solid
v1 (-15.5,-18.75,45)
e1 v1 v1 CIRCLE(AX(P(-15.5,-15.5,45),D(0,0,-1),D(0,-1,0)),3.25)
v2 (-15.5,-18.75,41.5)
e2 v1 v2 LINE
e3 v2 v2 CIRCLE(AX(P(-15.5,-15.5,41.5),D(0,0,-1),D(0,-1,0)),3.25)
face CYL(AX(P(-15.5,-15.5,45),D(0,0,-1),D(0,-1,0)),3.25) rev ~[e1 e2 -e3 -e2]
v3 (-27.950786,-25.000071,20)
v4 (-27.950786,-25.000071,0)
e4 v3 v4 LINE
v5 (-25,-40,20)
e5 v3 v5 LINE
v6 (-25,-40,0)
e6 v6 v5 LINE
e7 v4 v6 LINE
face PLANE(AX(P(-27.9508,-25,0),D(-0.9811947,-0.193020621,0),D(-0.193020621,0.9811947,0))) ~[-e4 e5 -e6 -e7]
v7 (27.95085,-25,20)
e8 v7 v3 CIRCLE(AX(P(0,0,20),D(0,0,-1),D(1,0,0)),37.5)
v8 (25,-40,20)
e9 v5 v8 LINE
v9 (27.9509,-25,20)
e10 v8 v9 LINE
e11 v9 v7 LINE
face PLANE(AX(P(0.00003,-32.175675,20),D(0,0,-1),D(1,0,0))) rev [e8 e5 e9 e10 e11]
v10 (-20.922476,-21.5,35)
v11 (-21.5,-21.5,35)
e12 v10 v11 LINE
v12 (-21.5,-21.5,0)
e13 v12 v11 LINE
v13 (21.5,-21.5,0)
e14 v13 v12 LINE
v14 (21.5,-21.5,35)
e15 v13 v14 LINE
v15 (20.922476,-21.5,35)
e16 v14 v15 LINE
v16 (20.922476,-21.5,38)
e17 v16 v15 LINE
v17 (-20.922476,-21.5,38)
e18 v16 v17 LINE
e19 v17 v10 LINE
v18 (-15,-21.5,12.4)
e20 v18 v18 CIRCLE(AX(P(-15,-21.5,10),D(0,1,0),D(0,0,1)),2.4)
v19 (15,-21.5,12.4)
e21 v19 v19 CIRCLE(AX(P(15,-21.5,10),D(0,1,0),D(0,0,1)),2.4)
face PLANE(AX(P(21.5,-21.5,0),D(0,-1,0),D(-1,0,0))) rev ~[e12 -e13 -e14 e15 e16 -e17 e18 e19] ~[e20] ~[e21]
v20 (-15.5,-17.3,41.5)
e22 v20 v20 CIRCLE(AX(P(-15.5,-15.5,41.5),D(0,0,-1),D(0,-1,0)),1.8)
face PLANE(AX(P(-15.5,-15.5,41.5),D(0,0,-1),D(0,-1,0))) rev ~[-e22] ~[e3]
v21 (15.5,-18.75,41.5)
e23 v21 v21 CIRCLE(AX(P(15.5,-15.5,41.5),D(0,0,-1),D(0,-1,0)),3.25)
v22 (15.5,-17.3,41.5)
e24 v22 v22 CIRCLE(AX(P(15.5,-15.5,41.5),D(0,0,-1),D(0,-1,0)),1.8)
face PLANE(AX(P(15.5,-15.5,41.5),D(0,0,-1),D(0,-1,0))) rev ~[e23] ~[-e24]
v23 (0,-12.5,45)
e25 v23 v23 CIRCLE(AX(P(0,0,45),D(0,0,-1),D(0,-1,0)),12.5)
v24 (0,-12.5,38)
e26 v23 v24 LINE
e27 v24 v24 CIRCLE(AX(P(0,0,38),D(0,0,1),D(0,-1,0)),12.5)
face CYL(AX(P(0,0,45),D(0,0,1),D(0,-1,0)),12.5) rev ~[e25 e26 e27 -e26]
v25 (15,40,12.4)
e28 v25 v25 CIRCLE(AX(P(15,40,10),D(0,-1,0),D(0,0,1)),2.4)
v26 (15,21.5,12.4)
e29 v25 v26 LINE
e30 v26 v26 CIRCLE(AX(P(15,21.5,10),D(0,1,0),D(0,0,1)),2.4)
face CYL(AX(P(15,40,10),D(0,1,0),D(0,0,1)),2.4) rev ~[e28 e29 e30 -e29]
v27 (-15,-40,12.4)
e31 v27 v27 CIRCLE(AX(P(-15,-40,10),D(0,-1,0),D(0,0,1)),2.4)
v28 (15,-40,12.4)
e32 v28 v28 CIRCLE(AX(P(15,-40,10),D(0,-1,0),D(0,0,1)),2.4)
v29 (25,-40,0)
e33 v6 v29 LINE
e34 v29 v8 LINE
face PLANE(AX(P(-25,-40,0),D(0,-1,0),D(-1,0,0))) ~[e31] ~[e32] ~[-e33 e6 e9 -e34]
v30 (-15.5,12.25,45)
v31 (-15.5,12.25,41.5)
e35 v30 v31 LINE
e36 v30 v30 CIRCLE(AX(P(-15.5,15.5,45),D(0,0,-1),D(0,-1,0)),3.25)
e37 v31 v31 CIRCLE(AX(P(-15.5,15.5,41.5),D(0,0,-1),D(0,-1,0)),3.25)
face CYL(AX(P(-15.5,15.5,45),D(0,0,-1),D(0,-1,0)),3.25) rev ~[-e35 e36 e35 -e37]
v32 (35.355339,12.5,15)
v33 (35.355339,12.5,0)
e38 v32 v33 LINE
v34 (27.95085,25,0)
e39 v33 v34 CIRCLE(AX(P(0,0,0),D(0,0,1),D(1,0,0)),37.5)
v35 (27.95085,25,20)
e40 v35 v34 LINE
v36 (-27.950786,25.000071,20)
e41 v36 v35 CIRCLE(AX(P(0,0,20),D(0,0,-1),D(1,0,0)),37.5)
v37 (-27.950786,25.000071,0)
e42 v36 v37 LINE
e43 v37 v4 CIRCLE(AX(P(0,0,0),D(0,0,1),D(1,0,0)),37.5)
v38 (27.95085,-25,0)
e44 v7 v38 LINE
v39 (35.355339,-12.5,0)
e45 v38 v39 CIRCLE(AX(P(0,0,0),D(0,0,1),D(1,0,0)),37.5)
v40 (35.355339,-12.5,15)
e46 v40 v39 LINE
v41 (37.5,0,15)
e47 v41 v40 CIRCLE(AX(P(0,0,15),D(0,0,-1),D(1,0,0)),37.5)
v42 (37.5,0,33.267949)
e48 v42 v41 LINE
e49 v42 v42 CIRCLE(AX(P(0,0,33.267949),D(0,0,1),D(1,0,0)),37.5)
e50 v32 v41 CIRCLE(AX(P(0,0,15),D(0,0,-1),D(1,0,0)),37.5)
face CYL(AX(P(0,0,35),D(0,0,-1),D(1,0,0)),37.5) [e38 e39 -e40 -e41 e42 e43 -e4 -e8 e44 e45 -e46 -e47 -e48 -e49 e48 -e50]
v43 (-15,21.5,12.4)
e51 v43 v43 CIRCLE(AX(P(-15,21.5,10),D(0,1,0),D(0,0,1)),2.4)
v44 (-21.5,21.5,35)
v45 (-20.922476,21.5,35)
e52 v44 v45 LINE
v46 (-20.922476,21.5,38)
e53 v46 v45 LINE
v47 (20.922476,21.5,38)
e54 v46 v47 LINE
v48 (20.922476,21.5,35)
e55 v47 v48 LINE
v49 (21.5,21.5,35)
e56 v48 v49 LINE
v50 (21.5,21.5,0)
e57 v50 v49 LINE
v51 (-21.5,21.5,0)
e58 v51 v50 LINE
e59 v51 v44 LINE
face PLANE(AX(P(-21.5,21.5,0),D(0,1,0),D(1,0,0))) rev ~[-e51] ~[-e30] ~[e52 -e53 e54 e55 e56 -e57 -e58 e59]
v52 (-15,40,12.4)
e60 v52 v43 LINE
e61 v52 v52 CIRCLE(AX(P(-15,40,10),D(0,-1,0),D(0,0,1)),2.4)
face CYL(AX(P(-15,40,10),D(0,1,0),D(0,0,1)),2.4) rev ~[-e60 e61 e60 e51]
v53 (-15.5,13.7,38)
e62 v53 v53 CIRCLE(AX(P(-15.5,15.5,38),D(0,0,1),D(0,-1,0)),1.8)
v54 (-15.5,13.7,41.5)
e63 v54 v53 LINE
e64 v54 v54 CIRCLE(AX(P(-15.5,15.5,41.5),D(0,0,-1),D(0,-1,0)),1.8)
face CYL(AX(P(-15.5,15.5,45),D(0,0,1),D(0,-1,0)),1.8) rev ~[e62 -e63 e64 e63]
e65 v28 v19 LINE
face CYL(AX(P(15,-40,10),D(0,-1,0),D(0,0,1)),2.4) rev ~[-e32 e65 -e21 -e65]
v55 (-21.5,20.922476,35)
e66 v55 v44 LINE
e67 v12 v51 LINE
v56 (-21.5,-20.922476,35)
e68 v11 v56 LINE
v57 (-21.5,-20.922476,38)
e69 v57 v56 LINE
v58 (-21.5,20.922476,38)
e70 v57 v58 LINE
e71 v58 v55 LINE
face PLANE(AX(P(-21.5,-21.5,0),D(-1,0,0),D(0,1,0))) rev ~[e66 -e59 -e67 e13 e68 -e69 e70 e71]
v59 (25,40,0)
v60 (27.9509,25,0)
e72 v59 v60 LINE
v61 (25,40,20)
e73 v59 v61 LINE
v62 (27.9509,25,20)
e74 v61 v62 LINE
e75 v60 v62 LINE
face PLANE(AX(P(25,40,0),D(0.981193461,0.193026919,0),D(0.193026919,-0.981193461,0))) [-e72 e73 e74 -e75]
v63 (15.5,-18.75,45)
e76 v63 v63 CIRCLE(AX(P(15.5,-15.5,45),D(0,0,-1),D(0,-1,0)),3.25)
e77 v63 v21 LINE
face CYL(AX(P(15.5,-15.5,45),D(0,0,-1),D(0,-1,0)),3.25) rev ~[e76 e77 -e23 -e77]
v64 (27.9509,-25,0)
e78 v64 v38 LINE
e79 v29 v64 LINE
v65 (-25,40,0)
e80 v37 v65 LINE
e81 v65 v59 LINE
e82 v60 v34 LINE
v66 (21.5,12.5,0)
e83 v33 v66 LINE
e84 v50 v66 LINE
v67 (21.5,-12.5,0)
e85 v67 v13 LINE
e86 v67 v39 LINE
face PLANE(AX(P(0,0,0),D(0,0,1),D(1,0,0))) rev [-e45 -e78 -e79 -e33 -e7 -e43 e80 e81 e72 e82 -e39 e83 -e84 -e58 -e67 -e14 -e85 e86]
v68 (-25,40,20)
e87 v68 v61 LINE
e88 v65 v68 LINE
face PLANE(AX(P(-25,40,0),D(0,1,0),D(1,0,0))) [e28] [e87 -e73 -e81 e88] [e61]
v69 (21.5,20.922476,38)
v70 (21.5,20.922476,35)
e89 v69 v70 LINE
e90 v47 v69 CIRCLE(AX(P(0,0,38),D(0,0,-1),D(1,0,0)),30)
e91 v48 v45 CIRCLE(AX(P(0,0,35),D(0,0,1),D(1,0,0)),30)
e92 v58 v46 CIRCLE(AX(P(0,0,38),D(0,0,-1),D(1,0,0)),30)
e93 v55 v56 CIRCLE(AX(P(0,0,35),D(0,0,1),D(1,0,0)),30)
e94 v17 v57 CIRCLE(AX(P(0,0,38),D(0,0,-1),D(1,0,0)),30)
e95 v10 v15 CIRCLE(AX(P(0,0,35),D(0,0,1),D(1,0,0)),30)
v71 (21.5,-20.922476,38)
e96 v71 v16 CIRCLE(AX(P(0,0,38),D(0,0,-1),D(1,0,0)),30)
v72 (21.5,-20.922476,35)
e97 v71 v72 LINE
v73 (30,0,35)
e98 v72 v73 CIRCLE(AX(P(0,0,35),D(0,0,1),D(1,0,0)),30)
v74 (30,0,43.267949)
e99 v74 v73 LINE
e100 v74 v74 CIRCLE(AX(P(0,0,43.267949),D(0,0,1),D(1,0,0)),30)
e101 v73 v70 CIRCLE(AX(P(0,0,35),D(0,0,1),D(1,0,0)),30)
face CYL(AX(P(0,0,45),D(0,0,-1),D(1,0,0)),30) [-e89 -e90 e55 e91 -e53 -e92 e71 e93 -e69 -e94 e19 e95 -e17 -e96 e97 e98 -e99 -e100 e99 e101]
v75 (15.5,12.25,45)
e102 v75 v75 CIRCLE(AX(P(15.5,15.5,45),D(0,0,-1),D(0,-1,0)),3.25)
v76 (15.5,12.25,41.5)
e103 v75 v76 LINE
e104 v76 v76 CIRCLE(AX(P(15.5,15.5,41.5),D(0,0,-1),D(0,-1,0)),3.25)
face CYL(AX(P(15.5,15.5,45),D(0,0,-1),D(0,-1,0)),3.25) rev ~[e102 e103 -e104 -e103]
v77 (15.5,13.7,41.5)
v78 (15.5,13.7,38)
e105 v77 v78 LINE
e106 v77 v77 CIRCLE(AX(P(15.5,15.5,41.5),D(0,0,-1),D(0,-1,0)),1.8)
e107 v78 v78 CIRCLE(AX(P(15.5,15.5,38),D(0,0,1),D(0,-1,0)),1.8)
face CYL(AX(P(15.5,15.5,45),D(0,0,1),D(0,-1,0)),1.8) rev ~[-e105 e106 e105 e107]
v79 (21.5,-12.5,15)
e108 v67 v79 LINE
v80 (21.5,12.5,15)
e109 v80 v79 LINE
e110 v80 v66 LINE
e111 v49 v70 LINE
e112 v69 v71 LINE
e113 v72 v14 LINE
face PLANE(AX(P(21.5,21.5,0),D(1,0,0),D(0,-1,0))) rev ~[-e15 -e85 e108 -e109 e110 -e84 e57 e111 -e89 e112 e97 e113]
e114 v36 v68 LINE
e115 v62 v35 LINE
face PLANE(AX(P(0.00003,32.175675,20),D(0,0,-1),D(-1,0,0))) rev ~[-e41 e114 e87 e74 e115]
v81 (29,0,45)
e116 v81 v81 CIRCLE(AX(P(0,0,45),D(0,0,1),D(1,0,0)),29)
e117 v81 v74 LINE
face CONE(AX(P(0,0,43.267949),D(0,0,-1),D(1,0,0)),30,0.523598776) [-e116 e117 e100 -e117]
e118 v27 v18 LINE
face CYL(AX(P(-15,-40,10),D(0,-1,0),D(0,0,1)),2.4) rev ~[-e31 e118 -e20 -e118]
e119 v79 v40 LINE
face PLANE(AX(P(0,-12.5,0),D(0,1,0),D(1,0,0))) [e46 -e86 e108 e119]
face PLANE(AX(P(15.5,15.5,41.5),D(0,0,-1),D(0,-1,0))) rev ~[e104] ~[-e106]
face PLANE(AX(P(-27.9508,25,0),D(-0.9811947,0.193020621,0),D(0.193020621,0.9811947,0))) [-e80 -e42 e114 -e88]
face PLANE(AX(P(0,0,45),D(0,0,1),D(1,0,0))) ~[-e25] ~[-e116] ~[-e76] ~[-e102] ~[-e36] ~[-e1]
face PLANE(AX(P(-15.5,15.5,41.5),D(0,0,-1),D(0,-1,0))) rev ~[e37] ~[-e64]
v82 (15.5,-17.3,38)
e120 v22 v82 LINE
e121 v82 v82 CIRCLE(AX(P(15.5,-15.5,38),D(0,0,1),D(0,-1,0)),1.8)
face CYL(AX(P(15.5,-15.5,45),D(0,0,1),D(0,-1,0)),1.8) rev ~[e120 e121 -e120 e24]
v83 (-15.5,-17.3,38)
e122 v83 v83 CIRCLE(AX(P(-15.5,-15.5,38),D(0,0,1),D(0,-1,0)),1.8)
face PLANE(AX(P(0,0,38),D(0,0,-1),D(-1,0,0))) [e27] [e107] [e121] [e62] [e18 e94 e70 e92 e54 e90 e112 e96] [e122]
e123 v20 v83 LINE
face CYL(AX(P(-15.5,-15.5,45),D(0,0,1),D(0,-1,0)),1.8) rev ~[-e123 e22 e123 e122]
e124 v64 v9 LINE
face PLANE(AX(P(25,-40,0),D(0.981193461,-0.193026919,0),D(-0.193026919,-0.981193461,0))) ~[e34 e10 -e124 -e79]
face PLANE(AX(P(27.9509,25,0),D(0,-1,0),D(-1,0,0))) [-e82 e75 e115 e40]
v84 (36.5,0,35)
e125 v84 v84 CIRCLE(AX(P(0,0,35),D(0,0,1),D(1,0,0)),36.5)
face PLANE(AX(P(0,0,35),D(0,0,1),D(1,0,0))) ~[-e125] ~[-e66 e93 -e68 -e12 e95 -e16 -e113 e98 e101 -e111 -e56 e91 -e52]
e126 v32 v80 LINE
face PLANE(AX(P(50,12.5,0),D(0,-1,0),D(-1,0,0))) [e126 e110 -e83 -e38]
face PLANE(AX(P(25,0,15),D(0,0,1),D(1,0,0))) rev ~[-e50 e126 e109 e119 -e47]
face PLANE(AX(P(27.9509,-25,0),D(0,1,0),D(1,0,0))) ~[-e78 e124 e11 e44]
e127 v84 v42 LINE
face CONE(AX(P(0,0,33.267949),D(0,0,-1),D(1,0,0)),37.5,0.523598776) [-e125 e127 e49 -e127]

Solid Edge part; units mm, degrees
sketch "Sketch1" plane through (0, 0, 0) normal (0, -1, 0) x (1, 0, 0)
  line L0 (0, 45) -> (30, 45)
  line L1 (30, 45) -> (30, 35)
  line L2 (30, 35) -> (37.5, 35)
  line L3 (37.5, 35) -> (37.5, 0)
  line L4 (0, 0) -> (37.5, 0)
  dimension "D1" = 45
  dimension "D2" = 10
revolve "RevolvedProtrusion1" add sketch "Sketch1" angle 360 about axis through (0, 0, 0) along (0, 0, 1)
chamfer "Chamfer_1" distance 1 angle 60 2 edges at (-37.5, 0, 35) (-30, 0, 45) measured on face at (25.75, -24.25, 35) measured on face at (20.6, -19.4, 45)
sketch "Sketch2" plane through (0, 0, 0) normal (0, 0, -1) x (0, 1, 0)
  line L0 (-21.5, -21.5) -> (21.5, -21.5)
  line L1 (21.5, -21.5) -> (21.5, 21.5)
  line L2 (21.5, 21.5) -> (-21.5, 21.5)
  line L3 (-21.5, 21.5) -> (-21.5, -21.5)
  dimension "D1" = 43
extrude "ExtrudedCutout_1" cut sketch "Sketch2" against normal blind 38
hole "Hole_1" at (0, 0, 45) direction (0, 0, -1) diameter 25 end up to next
hole "Hole_2" at (15.5, -15.5, 45) direction (0, 0, -1) diameter 3.6 end up to next counterbore diameter 6.5 counterbore depth 3.5
hole "Hole1" at (15.5, 15.5, 45) direction (0, 0, -1) diameter 3.6 end up to next counterbore diameter 6.5 counterbore depth 3.5
hole "Hole2" at (-15.5, 15.5, 45) direction (0, 0, -1) diameter 3.6 end up to next counterbore diameter 6.5 counterbore depth 3.5
hole "Hole3" at (-15.5, -15.5, 45) direction (0, 0, -1) diameter 3.6 end up to next counterbore diameter 6.5 counterbore depth 3.5
sketch "Sketch3" plane through (0, 0, 0) normal (0, 0, -1) x (-1, 0, 0)
  line L0 (0, 12.5) -> (0, -12.5)
  line L1 (0, -12.5) -> (-50, -12.5)
  line L2 (-50, -12.5) -> (-50, 12.5)
  line L3 (-50, 12.5) -> (0, 12.5)
  dimension "D1" = 25
  dimension "D2" = 50
extrude "ExtrudedCutout_2" cut sketch "Sketch3" against normal blind 15
sketch "Sketch4" plane through (-1.0723, 0, 0) normal (0, 0, -1) x (0, -1, 0)
  line L0 (-40, 23.9277) -> (-40, -26.0723)
  line L1 (-40, -26.0723) -> (-25, -29.0232)
  line L2 (-25, -29.0232) -> (-25, 26.8785)
  line L3 (-25, 26.8785) -> (-40, 23.9277)
  dimension "D1" = 50
  dimension "D2" = 25
  dimension "D3" = 15
extrude "ExtrudedProtrusion_1" add sketch "Sketch4" against normal blind 20
hole "Hole_6" at (-15, 40, 10) direction (0, -1, 0) diameter 4.8 end up to next
hole "Hole4" at (15, 40, 10) direction (0, -1, 0) diameter 4.8 end up to next
mirror "Mirror1" about plane through (0, 0, 0) normal (0, -1, 0) of "ExtrudedProtrusion_1", "Hole_6", "Hole4"
properties material "Polyethylene, low density"
